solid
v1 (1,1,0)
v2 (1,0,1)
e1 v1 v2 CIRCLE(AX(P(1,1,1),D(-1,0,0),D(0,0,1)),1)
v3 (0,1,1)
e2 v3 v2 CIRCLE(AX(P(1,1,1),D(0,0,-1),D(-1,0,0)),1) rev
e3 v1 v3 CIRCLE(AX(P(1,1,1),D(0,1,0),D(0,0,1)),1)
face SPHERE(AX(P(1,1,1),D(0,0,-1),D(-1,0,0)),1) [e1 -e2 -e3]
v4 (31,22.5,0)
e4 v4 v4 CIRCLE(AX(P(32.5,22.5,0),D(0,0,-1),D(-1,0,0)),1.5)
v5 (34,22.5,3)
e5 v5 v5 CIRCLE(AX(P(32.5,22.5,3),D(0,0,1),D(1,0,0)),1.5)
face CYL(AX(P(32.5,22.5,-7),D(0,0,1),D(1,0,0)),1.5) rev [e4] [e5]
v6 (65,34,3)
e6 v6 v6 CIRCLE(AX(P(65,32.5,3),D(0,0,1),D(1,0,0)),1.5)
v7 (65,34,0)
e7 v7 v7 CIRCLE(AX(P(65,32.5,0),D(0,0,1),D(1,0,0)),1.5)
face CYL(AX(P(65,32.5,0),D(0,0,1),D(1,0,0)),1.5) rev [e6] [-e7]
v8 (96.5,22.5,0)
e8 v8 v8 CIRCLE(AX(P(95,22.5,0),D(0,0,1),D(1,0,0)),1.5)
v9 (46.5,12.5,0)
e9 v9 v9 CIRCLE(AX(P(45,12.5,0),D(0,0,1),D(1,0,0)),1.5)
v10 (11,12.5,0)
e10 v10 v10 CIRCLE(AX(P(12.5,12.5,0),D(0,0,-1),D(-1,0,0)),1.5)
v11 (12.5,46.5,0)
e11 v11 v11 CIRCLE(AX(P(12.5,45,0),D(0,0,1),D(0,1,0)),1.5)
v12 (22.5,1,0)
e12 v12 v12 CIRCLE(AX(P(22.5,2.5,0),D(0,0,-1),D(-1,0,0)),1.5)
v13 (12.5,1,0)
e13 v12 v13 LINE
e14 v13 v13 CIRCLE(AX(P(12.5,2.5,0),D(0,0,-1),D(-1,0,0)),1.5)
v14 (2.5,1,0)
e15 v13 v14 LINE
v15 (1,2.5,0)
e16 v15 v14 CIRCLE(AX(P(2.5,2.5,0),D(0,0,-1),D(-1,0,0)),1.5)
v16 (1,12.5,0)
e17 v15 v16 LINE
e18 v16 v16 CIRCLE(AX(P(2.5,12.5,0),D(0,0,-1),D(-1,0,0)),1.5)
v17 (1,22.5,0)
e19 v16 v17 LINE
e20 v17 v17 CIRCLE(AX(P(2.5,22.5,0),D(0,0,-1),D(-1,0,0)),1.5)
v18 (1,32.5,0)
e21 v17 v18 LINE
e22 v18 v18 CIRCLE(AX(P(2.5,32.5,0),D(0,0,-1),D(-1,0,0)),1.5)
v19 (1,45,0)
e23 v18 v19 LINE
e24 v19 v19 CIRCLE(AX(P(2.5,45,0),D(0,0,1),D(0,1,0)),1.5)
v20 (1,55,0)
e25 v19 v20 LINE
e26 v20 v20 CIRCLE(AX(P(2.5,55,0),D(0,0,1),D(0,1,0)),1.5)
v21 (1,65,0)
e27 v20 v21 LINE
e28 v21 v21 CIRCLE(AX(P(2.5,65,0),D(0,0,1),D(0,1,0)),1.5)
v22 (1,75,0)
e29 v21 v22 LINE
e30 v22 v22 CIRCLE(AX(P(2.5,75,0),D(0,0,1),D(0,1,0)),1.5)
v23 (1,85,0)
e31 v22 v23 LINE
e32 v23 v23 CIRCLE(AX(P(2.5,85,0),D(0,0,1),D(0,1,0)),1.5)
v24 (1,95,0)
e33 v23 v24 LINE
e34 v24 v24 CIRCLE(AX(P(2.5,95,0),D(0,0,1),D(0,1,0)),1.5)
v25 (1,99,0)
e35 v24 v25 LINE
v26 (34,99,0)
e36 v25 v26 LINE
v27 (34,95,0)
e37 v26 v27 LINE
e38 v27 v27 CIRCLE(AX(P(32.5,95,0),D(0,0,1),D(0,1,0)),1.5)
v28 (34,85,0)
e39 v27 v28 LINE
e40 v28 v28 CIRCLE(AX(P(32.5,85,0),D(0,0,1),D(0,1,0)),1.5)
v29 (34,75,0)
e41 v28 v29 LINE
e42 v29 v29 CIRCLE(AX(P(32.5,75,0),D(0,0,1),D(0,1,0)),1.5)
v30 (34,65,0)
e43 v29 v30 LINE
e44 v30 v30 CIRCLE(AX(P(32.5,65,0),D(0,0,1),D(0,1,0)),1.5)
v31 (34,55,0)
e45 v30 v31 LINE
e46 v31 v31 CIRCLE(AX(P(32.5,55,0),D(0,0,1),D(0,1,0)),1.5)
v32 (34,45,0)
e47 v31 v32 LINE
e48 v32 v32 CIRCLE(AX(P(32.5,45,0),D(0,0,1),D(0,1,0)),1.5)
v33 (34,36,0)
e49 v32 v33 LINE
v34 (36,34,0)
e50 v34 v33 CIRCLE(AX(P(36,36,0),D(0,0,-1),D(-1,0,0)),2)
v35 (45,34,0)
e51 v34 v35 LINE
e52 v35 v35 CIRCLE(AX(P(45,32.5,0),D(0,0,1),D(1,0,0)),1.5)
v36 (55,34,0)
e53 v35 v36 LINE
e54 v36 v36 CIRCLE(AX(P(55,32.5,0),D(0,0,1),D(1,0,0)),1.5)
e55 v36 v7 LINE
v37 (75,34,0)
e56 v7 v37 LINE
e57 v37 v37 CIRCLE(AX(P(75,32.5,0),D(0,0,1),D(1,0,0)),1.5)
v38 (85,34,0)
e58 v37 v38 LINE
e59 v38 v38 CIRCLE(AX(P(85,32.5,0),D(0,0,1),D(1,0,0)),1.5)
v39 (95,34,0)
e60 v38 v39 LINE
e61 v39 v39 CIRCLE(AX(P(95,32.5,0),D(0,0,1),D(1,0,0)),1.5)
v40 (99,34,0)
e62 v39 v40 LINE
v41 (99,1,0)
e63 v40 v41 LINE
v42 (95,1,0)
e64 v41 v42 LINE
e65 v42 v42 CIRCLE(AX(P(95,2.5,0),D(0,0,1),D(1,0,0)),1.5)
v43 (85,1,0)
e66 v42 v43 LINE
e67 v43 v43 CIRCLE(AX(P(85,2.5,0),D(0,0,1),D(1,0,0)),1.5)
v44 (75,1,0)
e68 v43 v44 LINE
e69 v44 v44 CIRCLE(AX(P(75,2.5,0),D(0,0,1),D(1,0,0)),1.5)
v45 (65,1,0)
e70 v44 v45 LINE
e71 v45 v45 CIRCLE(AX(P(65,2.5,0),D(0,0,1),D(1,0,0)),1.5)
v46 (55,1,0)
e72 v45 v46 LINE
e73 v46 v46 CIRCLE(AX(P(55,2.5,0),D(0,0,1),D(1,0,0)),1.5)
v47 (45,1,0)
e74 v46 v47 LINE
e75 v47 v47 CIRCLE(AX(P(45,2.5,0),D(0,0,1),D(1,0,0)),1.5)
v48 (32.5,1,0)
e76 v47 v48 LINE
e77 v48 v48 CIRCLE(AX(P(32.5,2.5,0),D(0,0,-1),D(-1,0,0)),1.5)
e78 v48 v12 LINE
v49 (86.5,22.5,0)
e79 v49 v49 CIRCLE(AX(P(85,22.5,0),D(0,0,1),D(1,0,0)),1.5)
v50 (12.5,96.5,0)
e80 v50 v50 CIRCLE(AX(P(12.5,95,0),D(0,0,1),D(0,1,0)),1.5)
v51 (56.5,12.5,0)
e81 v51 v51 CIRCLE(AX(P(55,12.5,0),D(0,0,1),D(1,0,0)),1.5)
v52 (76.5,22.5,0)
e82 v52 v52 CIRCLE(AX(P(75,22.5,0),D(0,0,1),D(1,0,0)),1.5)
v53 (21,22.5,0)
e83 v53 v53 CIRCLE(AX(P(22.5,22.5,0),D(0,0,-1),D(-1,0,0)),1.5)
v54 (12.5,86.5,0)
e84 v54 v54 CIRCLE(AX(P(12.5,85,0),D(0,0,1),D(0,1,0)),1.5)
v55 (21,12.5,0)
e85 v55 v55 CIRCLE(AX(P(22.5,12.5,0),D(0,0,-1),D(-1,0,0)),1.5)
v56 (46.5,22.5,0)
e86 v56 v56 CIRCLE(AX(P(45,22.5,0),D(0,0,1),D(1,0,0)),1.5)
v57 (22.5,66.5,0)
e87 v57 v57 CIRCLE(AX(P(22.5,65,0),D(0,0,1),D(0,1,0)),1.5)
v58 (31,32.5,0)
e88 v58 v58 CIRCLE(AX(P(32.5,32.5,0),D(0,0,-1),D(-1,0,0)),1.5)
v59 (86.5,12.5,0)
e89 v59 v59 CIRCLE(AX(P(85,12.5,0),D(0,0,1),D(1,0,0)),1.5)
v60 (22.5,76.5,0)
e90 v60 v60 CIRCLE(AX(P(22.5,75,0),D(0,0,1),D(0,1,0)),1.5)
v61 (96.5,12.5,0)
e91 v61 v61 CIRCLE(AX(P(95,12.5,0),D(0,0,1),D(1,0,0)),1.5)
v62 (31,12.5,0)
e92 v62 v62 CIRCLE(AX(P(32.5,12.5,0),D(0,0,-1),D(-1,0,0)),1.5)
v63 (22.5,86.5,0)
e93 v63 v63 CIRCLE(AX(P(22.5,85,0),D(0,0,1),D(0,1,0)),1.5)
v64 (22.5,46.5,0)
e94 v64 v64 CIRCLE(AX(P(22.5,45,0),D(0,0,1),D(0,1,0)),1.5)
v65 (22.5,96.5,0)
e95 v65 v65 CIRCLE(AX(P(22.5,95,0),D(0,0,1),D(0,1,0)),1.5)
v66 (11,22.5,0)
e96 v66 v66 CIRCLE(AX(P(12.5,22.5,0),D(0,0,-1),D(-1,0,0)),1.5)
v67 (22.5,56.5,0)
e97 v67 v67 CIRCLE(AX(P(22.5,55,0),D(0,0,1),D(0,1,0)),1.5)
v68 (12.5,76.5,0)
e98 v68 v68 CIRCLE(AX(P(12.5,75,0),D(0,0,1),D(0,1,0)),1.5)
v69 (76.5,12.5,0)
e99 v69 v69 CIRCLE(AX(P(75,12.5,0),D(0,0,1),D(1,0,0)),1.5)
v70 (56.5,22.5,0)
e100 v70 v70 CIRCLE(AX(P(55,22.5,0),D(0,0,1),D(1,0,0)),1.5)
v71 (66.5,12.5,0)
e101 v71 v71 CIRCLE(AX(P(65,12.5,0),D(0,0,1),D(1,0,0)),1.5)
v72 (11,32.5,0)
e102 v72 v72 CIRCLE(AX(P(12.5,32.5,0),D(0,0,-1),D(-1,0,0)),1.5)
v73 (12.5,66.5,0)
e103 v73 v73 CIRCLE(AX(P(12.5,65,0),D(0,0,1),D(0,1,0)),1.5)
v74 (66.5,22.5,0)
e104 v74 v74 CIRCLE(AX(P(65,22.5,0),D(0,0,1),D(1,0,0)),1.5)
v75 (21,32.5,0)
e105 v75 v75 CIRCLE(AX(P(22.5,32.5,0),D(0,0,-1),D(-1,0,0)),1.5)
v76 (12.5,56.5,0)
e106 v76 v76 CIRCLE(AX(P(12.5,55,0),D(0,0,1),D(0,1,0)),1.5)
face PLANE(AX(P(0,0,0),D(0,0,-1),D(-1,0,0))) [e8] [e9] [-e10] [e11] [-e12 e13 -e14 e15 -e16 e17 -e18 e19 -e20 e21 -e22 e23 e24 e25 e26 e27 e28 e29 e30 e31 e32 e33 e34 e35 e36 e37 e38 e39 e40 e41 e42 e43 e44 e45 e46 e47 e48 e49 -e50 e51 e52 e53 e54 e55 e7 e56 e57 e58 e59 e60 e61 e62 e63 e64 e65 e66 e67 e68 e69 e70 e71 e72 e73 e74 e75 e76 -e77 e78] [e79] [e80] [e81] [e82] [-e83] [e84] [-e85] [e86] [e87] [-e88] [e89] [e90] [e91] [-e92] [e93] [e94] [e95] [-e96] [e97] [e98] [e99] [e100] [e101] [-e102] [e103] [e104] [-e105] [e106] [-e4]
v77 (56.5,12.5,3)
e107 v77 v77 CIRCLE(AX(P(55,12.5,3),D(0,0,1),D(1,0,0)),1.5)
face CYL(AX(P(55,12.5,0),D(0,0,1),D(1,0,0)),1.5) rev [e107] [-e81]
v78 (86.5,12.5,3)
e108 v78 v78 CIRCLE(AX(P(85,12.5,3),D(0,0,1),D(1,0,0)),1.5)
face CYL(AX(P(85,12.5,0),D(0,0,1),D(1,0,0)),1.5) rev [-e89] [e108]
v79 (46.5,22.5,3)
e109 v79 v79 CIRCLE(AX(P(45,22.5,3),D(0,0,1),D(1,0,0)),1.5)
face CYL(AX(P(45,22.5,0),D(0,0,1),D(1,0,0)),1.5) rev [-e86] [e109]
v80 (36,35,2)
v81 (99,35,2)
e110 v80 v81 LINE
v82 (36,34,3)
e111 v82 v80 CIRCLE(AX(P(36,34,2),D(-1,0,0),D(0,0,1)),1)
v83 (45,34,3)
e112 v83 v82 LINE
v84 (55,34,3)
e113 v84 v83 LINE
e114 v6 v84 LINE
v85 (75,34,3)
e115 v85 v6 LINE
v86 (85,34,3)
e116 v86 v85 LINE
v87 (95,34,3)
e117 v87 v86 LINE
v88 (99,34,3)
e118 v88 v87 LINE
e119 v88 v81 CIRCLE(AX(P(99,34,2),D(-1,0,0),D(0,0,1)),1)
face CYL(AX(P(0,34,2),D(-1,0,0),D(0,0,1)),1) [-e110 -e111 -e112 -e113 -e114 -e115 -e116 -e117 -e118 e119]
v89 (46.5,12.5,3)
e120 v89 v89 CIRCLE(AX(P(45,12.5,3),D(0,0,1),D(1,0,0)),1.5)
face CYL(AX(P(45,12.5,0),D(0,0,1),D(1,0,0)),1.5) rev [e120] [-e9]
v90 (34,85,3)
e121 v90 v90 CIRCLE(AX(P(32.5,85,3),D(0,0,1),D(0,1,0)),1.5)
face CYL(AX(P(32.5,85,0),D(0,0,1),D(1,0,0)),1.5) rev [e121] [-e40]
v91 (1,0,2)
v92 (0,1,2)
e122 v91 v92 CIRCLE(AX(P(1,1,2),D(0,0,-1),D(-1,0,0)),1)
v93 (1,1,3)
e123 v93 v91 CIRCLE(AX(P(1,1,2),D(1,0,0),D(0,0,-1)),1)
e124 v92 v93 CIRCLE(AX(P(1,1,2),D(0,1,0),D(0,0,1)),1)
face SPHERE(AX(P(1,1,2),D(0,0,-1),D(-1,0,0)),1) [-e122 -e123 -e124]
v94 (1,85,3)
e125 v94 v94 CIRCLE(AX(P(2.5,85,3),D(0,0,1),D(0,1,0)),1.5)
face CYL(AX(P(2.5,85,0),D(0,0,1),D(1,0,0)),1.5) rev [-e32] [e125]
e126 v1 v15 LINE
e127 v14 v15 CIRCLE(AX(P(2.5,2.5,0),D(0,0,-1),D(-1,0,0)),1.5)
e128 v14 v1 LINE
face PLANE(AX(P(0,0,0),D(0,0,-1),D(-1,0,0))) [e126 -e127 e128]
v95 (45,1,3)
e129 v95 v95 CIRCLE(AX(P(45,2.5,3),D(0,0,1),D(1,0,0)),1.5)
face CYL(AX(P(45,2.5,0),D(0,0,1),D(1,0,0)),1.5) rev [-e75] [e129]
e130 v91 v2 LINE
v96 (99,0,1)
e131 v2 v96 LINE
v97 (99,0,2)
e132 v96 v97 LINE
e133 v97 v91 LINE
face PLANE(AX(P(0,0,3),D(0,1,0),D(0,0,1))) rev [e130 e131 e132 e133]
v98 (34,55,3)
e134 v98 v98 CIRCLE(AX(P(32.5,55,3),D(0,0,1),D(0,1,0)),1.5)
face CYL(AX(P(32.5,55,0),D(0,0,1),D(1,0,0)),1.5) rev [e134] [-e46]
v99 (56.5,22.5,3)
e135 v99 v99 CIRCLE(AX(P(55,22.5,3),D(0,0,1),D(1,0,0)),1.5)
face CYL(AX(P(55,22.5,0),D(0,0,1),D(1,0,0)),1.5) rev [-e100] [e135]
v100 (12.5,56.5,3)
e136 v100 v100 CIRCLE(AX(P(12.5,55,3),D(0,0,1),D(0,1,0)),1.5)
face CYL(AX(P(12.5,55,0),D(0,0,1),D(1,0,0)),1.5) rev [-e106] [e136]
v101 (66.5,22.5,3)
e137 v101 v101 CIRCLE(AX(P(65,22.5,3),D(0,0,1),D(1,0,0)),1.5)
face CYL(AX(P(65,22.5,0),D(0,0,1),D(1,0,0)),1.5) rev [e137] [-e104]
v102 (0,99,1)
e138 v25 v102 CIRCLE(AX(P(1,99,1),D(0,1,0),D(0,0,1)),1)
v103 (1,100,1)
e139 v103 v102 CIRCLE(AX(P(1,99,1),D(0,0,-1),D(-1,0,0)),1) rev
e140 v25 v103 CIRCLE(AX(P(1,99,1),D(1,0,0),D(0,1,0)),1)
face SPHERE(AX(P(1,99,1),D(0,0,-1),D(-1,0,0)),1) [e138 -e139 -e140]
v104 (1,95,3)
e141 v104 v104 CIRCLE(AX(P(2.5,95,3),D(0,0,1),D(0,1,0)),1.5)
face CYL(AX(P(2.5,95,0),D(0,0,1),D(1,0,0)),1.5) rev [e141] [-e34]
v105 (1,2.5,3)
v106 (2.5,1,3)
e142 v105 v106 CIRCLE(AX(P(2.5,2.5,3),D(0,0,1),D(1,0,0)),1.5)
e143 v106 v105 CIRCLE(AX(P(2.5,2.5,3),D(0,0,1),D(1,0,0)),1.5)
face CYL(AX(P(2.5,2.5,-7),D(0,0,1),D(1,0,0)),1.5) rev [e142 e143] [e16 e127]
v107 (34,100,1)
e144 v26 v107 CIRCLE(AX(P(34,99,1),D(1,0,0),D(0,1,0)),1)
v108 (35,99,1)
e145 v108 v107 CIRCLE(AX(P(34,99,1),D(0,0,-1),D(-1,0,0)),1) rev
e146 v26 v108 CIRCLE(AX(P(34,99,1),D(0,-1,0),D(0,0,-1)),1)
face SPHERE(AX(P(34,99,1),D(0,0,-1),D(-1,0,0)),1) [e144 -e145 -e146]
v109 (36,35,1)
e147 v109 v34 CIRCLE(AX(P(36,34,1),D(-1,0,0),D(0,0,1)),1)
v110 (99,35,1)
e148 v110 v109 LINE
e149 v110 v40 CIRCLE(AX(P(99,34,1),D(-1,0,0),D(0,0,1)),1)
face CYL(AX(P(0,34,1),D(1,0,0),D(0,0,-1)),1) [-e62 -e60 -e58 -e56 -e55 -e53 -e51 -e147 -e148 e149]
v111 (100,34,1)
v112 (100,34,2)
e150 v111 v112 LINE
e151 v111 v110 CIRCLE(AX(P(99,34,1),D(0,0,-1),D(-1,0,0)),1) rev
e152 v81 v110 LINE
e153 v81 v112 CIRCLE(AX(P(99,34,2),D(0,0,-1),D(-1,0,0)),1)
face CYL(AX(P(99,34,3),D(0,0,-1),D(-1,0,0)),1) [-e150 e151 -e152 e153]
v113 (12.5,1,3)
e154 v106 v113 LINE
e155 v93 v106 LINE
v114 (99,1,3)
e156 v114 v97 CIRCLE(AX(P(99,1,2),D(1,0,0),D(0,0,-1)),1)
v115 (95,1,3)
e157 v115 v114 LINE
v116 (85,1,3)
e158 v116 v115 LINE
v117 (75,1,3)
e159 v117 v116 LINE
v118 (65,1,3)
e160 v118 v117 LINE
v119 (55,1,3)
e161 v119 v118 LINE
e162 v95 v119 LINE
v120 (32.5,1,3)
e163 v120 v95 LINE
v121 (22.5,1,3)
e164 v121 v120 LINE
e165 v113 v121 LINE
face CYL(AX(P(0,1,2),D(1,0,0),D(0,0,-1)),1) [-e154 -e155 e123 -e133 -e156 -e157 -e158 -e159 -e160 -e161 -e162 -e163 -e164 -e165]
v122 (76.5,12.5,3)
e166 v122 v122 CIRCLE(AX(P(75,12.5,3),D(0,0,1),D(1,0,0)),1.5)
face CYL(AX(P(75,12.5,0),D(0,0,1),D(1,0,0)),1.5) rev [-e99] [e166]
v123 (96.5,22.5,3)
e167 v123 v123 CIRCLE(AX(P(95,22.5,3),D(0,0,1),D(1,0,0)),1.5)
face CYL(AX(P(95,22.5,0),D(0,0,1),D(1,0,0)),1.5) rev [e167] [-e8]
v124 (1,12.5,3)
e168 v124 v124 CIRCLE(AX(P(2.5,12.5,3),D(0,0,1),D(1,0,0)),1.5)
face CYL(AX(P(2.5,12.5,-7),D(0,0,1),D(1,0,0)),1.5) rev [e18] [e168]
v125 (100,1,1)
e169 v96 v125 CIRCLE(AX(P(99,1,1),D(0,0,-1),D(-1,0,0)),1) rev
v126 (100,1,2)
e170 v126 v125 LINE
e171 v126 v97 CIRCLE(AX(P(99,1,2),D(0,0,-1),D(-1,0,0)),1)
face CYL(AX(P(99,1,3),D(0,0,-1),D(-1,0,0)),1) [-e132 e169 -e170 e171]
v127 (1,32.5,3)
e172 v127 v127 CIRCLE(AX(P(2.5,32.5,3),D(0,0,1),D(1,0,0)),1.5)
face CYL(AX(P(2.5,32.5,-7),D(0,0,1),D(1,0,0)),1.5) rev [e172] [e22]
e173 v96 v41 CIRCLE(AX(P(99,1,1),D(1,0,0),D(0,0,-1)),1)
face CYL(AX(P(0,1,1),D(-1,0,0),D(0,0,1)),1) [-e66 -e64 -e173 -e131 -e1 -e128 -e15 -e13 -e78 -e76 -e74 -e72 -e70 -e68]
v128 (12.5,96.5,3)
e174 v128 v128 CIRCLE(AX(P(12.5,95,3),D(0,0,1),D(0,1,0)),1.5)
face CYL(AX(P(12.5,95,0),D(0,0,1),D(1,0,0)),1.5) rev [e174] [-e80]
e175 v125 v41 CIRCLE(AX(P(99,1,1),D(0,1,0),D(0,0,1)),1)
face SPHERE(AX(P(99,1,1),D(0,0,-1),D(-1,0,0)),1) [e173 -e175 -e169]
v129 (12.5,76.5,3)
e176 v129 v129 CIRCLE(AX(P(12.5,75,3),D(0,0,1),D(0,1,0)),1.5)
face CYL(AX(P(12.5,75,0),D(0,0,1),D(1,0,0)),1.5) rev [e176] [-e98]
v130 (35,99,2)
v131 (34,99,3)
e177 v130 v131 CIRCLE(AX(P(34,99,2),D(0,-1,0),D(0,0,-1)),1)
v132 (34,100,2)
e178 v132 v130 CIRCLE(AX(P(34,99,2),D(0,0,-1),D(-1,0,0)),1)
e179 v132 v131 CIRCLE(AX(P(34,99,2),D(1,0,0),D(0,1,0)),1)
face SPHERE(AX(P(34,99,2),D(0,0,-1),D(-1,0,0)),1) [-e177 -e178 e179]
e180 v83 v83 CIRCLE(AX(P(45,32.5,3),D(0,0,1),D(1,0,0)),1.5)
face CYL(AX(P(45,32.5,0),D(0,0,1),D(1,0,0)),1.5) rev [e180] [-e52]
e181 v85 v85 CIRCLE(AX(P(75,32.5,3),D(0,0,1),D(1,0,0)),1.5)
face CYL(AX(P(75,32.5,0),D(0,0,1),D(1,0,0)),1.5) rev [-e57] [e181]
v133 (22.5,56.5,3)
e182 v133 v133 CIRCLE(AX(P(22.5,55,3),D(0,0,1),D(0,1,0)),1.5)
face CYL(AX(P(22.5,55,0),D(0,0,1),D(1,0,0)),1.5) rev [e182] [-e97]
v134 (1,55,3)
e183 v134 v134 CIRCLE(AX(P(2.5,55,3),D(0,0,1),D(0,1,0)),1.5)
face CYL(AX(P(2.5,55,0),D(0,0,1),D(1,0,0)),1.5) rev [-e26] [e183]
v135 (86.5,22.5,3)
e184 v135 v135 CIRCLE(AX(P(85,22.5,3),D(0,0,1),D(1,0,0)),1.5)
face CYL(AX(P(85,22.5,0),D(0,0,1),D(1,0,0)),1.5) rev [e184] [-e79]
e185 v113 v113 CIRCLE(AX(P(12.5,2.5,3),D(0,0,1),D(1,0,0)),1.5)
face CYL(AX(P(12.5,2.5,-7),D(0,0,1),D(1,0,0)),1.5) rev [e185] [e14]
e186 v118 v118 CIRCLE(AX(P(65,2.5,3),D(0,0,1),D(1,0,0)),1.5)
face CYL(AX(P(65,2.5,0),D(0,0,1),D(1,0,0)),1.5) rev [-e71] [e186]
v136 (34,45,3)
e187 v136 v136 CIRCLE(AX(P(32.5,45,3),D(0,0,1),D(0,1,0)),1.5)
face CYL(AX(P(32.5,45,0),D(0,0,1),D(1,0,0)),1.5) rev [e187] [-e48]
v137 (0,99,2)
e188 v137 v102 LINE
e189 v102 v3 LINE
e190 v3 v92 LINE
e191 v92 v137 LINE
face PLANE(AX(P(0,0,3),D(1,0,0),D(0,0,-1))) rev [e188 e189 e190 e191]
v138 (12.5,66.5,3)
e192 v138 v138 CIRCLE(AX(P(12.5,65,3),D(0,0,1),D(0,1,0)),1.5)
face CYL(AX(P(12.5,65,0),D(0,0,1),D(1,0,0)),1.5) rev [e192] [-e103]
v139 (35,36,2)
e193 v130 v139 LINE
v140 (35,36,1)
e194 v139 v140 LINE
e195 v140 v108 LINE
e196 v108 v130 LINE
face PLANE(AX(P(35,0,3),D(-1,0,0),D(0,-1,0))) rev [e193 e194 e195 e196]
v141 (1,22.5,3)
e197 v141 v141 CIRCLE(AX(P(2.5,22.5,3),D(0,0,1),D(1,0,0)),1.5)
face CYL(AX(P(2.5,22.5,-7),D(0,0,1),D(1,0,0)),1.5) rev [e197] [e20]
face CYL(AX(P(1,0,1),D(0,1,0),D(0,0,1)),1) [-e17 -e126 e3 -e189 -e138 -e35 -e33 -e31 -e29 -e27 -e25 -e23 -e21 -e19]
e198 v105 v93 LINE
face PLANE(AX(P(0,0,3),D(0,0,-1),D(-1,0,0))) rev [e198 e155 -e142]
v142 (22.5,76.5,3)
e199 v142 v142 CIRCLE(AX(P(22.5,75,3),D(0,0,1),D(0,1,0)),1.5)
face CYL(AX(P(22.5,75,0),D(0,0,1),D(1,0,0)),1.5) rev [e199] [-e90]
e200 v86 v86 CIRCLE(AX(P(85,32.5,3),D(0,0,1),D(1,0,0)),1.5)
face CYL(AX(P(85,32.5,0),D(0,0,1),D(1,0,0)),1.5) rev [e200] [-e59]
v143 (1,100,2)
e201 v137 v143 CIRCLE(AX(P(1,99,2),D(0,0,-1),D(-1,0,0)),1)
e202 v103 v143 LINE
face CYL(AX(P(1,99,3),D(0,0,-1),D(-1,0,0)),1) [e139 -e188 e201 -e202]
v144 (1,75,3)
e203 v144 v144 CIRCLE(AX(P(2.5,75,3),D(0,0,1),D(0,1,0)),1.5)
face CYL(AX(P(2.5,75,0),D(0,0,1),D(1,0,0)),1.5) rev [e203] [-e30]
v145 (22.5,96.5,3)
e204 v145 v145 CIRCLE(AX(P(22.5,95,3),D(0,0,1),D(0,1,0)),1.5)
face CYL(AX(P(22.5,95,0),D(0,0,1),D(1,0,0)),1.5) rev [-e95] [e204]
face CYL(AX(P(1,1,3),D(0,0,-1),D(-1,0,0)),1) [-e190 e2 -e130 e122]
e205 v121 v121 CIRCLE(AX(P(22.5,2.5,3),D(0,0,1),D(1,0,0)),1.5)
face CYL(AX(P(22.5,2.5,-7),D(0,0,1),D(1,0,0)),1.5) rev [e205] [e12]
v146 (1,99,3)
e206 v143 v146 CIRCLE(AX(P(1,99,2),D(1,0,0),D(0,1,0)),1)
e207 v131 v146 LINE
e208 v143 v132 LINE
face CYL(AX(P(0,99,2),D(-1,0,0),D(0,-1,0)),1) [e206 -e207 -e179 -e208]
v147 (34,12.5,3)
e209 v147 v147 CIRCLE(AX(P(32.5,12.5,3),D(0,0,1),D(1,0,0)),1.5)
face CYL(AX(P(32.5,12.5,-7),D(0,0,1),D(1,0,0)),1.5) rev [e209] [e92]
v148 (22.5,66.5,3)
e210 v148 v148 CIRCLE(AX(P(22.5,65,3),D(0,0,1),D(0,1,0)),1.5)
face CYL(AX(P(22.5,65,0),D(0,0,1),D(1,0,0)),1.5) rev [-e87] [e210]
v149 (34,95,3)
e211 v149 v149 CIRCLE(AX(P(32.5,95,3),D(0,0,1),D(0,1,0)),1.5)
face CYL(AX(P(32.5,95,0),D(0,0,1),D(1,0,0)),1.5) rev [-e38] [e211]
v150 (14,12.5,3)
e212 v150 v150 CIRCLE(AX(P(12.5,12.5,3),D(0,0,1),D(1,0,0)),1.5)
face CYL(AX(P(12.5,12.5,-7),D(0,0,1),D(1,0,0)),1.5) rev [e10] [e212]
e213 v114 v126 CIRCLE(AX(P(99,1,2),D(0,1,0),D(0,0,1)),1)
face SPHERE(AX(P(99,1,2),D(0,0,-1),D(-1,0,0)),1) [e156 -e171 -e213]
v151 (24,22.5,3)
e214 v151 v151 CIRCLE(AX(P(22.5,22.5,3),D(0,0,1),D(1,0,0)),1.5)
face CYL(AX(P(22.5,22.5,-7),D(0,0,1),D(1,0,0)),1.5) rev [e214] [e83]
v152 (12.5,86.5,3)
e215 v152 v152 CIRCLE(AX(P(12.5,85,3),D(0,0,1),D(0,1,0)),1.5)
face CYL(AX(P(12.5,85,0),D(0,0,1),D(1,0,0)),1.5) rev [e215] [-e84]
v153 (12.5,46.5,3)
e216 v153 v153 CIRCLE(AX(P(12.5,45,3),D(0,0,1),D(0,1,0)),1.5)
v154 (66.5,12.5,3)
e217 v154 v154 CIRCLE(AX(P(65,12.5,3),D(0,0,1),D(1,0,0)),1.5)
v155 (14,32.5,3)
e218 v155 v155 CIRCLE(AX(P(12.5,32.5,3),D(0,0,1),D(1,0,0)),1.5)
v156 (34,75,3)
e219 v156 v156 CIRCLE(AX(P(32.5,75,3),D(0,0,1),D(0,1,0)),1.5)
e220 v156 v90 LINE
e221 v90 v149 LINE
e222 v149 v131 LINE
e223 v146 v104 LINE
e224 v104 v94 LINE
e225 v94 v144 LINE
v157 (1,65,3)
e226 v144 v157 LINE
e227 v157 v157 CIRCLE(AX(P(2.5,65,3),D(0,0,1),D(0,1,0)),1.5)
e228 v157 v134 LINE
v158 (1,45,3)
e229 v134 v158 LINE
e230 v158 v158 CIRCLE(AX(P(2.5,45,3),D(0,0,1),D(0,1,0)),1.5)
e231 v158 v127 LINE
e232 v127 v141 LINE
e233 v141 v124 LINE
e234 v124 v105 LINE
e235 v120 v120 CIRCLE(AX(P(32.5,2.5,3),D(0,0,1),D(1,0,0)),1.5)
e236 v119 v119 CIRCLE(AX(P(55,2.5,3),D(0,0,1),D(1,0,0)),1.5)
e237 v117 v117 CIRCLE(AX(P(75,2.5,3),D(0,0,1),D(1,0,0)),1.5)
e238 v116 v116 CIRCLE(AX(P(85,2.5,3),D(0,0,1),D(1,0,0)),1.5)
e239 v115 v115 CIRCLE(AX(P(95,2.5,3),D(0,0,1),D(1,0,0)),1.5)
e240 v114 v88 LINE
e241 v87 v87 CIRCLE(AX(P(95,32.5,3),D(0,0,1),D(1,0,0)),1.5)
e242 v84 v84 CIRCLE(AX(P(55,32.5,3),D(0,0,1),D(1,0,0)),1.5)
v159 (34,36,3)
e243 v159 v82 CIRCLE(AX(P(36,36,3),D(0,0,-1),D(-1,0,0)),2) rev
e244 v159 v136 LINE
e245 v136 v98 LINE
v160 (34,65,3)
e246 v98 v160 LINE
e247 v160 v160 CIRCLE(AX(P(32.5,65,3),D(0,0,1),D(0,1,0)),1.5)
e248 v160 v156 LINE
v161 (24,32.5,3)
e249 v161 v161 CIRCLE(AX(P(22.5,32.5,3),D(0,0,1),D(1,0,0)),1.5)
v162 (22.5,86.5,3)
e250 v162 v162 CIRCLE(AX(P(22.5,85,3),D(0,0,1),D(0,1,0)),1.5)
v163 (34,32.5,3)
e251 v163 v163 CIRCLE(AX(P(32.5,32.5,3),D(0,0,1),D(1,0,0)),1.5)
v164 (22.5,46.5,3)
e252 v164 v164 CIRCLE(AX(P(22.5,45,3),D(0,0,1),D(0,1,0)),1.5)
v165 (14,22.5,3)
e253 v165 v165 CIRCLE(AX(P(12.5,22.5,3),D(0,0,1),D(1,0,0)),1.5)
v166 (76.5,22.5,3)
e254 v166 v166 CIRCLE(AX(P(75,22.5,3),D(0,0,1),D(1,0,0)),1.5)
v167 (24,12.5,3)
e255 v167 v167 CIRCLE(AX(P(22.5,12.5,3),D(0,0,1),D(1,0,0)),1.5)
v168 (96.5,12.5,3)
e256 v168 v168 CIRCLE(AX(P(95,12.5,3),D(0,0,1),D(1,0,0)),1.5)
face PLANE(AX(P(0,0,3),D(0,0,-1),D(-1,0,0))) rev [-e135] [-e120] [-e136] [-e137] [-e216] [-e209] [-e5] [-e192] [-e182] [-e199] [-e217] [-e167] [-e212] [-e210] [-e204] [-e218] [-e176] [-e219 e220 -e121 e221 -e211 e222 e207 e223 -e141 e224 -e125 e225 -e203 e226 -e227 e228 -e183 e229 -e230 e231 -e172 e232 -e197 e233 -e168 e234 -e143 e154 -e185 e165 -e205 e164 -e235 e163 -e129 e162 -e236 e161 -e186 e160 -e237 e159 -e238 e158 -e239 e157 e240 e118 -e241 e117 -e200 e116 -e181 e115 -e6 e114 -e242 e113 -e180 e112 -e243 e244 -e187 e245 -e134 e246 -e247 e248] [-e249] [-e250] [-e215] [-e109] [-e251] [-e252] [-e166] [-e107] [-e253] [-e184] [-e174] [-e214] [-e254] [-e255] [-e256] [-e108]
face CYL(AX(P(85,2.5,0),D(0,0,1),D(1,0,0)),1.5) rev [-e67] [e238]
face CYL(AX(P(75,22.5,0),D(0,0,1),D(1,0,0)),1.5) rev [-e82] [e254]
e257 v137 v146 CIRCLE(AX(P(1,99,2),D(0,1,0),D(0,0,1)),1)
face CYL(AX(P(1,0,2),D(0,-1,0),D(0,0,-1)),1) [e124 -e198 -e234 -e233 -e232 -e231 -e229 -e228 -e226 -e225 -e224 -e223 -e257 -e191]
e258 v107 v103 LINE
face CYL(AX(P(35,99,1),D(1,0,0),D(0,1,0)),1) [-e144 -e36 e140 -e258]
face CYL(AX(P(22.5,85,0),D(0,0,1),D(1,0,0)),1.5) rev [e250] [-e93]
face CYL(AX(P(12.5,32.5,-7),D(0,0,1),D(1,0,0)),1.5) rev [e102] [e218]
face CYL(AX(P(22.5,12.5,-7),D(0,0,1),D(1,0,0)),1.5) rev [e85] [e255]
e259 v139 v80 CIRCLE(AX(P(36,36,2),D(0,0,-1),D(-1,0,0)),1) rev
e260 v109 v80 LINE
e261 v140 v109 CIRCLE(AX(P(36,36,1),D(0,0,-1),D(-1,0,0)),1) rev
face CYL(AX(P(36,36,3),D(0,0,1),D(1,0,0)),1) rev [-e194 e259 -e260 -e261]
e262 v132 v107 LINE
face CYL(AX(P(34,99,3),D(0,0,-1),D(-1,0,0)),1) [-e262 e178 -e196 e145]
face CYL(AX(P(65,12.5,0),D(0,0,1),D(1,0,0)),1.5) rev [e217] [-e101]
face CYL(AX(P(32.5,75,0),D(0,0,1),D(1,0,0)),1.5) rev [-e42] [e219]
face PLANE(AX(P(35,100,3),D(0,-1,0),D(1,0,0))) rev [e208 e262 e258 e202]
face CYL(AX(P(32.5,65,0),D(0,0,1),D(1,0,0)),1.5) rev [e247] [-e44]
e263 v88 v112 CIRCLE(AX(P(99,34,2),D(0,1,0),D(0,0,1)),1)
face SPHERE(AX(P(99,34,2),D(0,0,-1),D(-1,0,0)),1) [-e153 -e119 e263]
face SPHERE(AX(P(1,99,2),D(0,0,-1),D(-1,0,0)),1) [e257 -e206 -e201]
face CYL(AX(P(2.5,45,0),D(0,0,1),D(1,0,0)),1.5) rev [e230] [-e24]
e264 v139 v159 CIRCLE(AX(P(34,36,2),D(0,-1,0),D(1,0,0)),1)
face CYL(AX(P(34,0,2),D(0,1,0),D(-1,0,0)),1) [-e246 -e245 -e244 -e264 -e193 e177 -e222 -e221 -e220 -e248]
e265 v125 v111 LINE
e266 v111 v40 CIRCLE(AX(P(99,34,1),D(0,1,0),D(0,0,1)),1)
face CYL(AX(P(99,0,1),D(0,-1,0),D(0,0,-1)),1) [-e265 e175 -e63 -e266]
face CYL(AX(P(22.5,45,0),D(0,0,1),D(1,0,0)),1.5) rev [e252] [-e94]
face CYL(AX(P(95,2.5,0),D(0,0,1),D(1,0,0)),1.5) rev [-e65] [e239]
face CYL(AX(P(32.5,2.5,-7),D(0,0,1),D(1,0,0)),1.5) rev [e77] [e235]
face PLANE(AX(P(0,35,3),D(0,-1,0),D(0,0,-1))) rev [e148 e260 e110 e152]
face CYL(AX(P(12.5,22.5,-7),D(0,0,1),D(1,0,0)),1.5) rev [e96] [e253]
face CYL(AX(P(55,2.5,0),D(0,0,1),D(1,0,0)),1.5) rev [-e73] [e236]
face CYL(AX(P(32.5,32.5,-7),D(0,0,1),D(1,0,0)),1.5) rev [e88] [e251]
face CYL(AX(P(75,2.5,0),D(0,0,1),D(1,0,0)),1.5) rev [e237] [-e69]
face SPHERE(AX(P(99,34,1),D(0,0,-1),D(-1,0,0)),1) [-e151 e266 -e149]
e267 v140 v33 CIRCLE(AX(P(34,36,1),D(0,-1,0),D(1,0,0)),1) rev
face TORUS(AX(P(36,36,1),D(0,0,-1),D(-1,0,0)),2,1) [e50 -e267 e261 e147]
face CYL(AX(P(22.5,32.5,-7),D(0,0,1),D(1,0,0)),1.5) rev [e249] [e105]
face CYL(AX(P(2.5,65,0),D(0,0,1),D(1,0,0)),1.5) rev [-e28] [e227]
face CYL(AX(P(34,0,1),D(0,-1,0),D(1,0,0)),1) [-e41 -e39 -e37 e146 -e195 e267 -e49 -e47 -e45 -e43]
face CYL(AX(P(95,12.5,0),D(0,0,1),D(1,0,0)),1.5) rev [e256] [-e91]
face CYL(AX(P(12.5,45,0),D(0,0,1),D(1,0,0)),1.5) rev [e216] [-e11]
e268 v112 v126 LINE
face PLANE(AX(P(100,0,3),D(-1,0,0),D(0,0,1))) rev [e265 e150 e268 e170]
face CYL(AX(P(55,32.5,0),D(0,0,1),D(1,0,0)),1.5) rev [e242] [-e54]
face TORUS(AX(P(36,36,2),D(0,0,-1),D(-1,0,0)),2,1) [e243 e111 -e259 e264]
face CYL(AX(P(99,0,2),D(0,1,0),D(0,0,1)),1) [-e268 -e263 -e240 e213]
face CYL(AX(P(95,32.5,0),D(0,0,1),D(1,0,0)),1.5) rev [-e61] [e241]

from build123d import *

# Parameters (mm, degrees)
ESQUISSE1_W                        = 100
ESQUISSE1_H                        = 35
BOSS_EXTRU_1_DEPTH                 = 3
ESQUISSE2_R                        = 1.5
ENL_V_MAT_EXTRU_1_DEPTH            = 3
CONG_1_R                           = 1
R_P_TITION_CIRCULAIRE4_COUNT       = 2
R_P_TITION_CIRCULAIRE4_ANGLE       = 90
R_P_TITION_CIRCULAIRE4_2_COUNT     = 2
R_P_TITION_CIRCULAIRE4_2_ANGLE     = 90
CONG_1_OF_R_P_TITION_CIRCULAIRE4_R = 1
ESQUISSE4_R                        = 1.5
ENL_V_MAT_EXTRU_2_DEPTH            = 10
CONG_2_R                           = 1


with BuildPart() as part:
    # Esquisse1 → Boss.-Extru.1 (new body)
    with BuildSketch(Plane.XY):
        with Locations((50, 17.5)):
            Rectangle(ESQUISSE1_W, ESQUISSE1_H)
    boss_extru_1 = extrude(amount=BOSS_EXTRU_1_DEPTH)

    # Esquisse2 → Enlèv. mat.-Extru.1 (cut)
    with BuildSketch(Plane.XY.offset(3)):
        with Locations((95, 32.5)):
            Circle(ESQUISSE2_R)
        with Locations((85, 32.5)):
            Circle(ESQUISSE2_R)
        with Locations((75, 32.5)):
            Circle(ESQUISSE2_R)
        with Locations((65, 32.5)):
            Circle(ESQUISSE2_R)
        with Locations((55, 32.5)):
            Circle(ESQUISSE2_R)
        with Locations((45, 32.5)):
            Circle(ESQUISSE2_R)
        with Locations((85, 22.5)):
            Circle(ESQUISSE2_R)
        with Locations((75, 22.5)):
            Circle(ESQUISSE2_R)
        with Locations((65, 22.5)):
            Circle(ESQUISSE2_R)
        with Locations((55, 22.5)):
            Circle(ESQUISSE2_R)
        with Locations((45, 22.5)):
            Circle(ESQUISSE2_R)
        with Locations((85, 12.5)):
            Circle(ESQUISSE2_R)
        with Locations((75, 12.5)):
            Circle(ESQUISSE2_R)
        with Locations((65, 12.5)):
            Circle(ESQUISSE2_R)
        with Locations((55, 12.5)):
            Circle(ESQUISSE2_R)
        with Locations((45, 12.5)):
            Circle(ESQUISSE2_R)
        with Locations((85, 2.5)):
            Circle(ESQUISSE2_R)
        with Locations((75, 2.5)):
            Circle(ESQUISSE2_R)
        with Locations((65, 2.5)):
            Circle(ESQUISSE2_R)
        with Locations((55, 2.5)):
            Circle(ESQUISSE2_R)
        with Locations((45, 2.5)):
            Circle(ESQUISSE2_R)
        with Locations((95, 22.5)):
            Circle(ESQUISSE2_R)
        with Locations((95, 12.5)):
            Circle(ESQUISSE2_R)
        with Locations((95, 2.5)):
            Circle(ESQUISSE2_R)
    enl_v_mat_extru_1 = extrude(amount=-ENL_V_MAT_EXTRU_1_DEPTH, mode=Mode.SUBTRACT)

    # Congé1
    cong_1_edges = [part.edges().sort_by_distance(p)[0] for p in [
        (0, 35, 1.5),
        (100, 35, 1.5),
        (100, 0, 1.5),
        (0, 0, 1.5),
    ]]
    fillet(cong_1_edges, radius=CONG_1_R)


with BuildPart() as r_p_tition_circulaire4_1:
    # Répétition circulaire4: Boss.-Extru.1 ×2 about axis
    r_p_tition_circulaire4_axis = Axis((17.5, 17.5, 0), (0, 0, 1))
    for i in range(1, R_P_TITION_CIRCULAIRE4_COUNT):
        add(boss_extru_1.rotate(r_p_tition_circulaire4_axis, i * R_P_TITION_CIRCULAIRE4_ANGLE / (R_P_TITION_CIRCULAIRE4_COUNT - 1)))

    # R_p_tition circulaire4 2: Enlèv. mat.-Extru.1 ×2 about axis
    r_p_tition_circulaire4_2_axis = Axis((17.5, 17.5, 0), (0, 0, 1))
    for i in range(1, R_P_TITION_CIRCULAIRE4_2_COUNT):
        add(enl_v_mat_extru_1.rotate(r_p_tition_circulaire4_2_axis, i * R_P_TITION_CIRCULAIRE4_2_ANGLE / (R_P_TITION_CIRCULAIRE4_2_COUNT - 1)), mode=Mode.SUBTRACT)

    # Congé1 of Répétition circulaire4
    cong_1_of_r_p_tition_circulaire4_edges = [r_p_tition_circulaire4_1.edges().sort_by_distance(p)[0] for p in [
        (0, 0, 1.5),
        (0, 100, 1.5),
        (35, 100, 1.5),
        (35, 0, 1.5),
    ]]
    fillet(cong_1_of_r_p_tition_circulaire4_edges, radius=CONG_1_OF_R_P_TITION_CIRCULAIRE4_R)


with BuildPart() as part_1:
    add(part.part)

    # Répétition circulaire4 united with what: union Répétition circulaire4_1
    add(r_p_tition_circulaire4_1.part)

    # Esquisse4 → Enlèv. mat.-Extru.2 (cut)
    with BuildSketch(Plane.XY.offset(3)):
        with Locations((2.5, 2.5)):
            Circle(ESQUISSE4_R)
        with Locations((12.5, 2.5)):
            Circle(ESQUISSE4_R)
        with Locations((22.5, 2.5)):
            Circle(ESQUISSE4_R)
        with Locations((32.5, 2.5)):
            Circle(ESQUISSE4_R)
        with Locations((12.5, 12.5)):
            Circle(ESQUISSE4_R)
        with Locations((22.5, 12.5)):
            Circle(ESQUISSE4_R)
        with Locations((32.5, 12.5)):
            Circle(ESQUISSE4_R)
        with Locations((12.5, 22.5)):
            Circle(ESQUISSE4_R)
        with Locations((22.5, 22.5)):
            Circle(ESQUISSE4_R)
        with Locations((32.5, 22.5)):
            Circle(ESQUISSE4_R)
        with Locations((12.5, 32.5)):
            Circle(ESQUISSE4_R)
        with Locations((22.5, 32.5)):
            Circle(ESQUISSE4_R)
        with Locations((32.5, 32.5)):
            Circle(ESQUISSE4_R)
        with Locations((2.5, 12.5)):
            Circle(ESQUISSE4_R)
        with Locations((2.5, 22.5)):
            Circle(ESQUISSE4_R)
        with Locations((2.5, 32.5)):
            Circle(ESQUISSE4_R)
    extrude(amount=-ENL_V_MAT_EXTRU_2_DEPTH, mode=Mode.SUBTRACT)

    # Congé2
    cong_2_edges = [part_1.edges().sort_by_distance(p)[0] for p in [
        (67, 35, 0),
        (100, 17.5, 0),
        (99.707106781, 34.707106781, 0),
        (99.707106781, 0.292893219, 0),
        (67, 35, 3),
        (100, 17.5, 3),
        (99.707106781, 34.707106781, 3),
        (99.707106781, 0.292893219, 3),
        (35, 35, 1.5),
        (35, 67, 0),
        (35, 67, 3),
        (50, 0, 0),
        (50, 0, 3),
        (0, 50, 0),
        (17.5, 100, 0),
        (0.292893219, 99.707106781, 0),
        (34.707106781, 99.707106781, 0),
        (0.292893219, 0.292893219, 0),
        (0, 50, 3),
        (17.5, 100, 3),
        (0.292893219, 99.707106781, 3),
        (34.707106781, 99.707106781, 3),
        (0.292893219, 0.292893219, 3),
    ]]
    fillet(cong_2_edges, radius=CONG_2_R - 0.0001)  # a hair under: the kernel refuses the full size


solid = part_1.part
